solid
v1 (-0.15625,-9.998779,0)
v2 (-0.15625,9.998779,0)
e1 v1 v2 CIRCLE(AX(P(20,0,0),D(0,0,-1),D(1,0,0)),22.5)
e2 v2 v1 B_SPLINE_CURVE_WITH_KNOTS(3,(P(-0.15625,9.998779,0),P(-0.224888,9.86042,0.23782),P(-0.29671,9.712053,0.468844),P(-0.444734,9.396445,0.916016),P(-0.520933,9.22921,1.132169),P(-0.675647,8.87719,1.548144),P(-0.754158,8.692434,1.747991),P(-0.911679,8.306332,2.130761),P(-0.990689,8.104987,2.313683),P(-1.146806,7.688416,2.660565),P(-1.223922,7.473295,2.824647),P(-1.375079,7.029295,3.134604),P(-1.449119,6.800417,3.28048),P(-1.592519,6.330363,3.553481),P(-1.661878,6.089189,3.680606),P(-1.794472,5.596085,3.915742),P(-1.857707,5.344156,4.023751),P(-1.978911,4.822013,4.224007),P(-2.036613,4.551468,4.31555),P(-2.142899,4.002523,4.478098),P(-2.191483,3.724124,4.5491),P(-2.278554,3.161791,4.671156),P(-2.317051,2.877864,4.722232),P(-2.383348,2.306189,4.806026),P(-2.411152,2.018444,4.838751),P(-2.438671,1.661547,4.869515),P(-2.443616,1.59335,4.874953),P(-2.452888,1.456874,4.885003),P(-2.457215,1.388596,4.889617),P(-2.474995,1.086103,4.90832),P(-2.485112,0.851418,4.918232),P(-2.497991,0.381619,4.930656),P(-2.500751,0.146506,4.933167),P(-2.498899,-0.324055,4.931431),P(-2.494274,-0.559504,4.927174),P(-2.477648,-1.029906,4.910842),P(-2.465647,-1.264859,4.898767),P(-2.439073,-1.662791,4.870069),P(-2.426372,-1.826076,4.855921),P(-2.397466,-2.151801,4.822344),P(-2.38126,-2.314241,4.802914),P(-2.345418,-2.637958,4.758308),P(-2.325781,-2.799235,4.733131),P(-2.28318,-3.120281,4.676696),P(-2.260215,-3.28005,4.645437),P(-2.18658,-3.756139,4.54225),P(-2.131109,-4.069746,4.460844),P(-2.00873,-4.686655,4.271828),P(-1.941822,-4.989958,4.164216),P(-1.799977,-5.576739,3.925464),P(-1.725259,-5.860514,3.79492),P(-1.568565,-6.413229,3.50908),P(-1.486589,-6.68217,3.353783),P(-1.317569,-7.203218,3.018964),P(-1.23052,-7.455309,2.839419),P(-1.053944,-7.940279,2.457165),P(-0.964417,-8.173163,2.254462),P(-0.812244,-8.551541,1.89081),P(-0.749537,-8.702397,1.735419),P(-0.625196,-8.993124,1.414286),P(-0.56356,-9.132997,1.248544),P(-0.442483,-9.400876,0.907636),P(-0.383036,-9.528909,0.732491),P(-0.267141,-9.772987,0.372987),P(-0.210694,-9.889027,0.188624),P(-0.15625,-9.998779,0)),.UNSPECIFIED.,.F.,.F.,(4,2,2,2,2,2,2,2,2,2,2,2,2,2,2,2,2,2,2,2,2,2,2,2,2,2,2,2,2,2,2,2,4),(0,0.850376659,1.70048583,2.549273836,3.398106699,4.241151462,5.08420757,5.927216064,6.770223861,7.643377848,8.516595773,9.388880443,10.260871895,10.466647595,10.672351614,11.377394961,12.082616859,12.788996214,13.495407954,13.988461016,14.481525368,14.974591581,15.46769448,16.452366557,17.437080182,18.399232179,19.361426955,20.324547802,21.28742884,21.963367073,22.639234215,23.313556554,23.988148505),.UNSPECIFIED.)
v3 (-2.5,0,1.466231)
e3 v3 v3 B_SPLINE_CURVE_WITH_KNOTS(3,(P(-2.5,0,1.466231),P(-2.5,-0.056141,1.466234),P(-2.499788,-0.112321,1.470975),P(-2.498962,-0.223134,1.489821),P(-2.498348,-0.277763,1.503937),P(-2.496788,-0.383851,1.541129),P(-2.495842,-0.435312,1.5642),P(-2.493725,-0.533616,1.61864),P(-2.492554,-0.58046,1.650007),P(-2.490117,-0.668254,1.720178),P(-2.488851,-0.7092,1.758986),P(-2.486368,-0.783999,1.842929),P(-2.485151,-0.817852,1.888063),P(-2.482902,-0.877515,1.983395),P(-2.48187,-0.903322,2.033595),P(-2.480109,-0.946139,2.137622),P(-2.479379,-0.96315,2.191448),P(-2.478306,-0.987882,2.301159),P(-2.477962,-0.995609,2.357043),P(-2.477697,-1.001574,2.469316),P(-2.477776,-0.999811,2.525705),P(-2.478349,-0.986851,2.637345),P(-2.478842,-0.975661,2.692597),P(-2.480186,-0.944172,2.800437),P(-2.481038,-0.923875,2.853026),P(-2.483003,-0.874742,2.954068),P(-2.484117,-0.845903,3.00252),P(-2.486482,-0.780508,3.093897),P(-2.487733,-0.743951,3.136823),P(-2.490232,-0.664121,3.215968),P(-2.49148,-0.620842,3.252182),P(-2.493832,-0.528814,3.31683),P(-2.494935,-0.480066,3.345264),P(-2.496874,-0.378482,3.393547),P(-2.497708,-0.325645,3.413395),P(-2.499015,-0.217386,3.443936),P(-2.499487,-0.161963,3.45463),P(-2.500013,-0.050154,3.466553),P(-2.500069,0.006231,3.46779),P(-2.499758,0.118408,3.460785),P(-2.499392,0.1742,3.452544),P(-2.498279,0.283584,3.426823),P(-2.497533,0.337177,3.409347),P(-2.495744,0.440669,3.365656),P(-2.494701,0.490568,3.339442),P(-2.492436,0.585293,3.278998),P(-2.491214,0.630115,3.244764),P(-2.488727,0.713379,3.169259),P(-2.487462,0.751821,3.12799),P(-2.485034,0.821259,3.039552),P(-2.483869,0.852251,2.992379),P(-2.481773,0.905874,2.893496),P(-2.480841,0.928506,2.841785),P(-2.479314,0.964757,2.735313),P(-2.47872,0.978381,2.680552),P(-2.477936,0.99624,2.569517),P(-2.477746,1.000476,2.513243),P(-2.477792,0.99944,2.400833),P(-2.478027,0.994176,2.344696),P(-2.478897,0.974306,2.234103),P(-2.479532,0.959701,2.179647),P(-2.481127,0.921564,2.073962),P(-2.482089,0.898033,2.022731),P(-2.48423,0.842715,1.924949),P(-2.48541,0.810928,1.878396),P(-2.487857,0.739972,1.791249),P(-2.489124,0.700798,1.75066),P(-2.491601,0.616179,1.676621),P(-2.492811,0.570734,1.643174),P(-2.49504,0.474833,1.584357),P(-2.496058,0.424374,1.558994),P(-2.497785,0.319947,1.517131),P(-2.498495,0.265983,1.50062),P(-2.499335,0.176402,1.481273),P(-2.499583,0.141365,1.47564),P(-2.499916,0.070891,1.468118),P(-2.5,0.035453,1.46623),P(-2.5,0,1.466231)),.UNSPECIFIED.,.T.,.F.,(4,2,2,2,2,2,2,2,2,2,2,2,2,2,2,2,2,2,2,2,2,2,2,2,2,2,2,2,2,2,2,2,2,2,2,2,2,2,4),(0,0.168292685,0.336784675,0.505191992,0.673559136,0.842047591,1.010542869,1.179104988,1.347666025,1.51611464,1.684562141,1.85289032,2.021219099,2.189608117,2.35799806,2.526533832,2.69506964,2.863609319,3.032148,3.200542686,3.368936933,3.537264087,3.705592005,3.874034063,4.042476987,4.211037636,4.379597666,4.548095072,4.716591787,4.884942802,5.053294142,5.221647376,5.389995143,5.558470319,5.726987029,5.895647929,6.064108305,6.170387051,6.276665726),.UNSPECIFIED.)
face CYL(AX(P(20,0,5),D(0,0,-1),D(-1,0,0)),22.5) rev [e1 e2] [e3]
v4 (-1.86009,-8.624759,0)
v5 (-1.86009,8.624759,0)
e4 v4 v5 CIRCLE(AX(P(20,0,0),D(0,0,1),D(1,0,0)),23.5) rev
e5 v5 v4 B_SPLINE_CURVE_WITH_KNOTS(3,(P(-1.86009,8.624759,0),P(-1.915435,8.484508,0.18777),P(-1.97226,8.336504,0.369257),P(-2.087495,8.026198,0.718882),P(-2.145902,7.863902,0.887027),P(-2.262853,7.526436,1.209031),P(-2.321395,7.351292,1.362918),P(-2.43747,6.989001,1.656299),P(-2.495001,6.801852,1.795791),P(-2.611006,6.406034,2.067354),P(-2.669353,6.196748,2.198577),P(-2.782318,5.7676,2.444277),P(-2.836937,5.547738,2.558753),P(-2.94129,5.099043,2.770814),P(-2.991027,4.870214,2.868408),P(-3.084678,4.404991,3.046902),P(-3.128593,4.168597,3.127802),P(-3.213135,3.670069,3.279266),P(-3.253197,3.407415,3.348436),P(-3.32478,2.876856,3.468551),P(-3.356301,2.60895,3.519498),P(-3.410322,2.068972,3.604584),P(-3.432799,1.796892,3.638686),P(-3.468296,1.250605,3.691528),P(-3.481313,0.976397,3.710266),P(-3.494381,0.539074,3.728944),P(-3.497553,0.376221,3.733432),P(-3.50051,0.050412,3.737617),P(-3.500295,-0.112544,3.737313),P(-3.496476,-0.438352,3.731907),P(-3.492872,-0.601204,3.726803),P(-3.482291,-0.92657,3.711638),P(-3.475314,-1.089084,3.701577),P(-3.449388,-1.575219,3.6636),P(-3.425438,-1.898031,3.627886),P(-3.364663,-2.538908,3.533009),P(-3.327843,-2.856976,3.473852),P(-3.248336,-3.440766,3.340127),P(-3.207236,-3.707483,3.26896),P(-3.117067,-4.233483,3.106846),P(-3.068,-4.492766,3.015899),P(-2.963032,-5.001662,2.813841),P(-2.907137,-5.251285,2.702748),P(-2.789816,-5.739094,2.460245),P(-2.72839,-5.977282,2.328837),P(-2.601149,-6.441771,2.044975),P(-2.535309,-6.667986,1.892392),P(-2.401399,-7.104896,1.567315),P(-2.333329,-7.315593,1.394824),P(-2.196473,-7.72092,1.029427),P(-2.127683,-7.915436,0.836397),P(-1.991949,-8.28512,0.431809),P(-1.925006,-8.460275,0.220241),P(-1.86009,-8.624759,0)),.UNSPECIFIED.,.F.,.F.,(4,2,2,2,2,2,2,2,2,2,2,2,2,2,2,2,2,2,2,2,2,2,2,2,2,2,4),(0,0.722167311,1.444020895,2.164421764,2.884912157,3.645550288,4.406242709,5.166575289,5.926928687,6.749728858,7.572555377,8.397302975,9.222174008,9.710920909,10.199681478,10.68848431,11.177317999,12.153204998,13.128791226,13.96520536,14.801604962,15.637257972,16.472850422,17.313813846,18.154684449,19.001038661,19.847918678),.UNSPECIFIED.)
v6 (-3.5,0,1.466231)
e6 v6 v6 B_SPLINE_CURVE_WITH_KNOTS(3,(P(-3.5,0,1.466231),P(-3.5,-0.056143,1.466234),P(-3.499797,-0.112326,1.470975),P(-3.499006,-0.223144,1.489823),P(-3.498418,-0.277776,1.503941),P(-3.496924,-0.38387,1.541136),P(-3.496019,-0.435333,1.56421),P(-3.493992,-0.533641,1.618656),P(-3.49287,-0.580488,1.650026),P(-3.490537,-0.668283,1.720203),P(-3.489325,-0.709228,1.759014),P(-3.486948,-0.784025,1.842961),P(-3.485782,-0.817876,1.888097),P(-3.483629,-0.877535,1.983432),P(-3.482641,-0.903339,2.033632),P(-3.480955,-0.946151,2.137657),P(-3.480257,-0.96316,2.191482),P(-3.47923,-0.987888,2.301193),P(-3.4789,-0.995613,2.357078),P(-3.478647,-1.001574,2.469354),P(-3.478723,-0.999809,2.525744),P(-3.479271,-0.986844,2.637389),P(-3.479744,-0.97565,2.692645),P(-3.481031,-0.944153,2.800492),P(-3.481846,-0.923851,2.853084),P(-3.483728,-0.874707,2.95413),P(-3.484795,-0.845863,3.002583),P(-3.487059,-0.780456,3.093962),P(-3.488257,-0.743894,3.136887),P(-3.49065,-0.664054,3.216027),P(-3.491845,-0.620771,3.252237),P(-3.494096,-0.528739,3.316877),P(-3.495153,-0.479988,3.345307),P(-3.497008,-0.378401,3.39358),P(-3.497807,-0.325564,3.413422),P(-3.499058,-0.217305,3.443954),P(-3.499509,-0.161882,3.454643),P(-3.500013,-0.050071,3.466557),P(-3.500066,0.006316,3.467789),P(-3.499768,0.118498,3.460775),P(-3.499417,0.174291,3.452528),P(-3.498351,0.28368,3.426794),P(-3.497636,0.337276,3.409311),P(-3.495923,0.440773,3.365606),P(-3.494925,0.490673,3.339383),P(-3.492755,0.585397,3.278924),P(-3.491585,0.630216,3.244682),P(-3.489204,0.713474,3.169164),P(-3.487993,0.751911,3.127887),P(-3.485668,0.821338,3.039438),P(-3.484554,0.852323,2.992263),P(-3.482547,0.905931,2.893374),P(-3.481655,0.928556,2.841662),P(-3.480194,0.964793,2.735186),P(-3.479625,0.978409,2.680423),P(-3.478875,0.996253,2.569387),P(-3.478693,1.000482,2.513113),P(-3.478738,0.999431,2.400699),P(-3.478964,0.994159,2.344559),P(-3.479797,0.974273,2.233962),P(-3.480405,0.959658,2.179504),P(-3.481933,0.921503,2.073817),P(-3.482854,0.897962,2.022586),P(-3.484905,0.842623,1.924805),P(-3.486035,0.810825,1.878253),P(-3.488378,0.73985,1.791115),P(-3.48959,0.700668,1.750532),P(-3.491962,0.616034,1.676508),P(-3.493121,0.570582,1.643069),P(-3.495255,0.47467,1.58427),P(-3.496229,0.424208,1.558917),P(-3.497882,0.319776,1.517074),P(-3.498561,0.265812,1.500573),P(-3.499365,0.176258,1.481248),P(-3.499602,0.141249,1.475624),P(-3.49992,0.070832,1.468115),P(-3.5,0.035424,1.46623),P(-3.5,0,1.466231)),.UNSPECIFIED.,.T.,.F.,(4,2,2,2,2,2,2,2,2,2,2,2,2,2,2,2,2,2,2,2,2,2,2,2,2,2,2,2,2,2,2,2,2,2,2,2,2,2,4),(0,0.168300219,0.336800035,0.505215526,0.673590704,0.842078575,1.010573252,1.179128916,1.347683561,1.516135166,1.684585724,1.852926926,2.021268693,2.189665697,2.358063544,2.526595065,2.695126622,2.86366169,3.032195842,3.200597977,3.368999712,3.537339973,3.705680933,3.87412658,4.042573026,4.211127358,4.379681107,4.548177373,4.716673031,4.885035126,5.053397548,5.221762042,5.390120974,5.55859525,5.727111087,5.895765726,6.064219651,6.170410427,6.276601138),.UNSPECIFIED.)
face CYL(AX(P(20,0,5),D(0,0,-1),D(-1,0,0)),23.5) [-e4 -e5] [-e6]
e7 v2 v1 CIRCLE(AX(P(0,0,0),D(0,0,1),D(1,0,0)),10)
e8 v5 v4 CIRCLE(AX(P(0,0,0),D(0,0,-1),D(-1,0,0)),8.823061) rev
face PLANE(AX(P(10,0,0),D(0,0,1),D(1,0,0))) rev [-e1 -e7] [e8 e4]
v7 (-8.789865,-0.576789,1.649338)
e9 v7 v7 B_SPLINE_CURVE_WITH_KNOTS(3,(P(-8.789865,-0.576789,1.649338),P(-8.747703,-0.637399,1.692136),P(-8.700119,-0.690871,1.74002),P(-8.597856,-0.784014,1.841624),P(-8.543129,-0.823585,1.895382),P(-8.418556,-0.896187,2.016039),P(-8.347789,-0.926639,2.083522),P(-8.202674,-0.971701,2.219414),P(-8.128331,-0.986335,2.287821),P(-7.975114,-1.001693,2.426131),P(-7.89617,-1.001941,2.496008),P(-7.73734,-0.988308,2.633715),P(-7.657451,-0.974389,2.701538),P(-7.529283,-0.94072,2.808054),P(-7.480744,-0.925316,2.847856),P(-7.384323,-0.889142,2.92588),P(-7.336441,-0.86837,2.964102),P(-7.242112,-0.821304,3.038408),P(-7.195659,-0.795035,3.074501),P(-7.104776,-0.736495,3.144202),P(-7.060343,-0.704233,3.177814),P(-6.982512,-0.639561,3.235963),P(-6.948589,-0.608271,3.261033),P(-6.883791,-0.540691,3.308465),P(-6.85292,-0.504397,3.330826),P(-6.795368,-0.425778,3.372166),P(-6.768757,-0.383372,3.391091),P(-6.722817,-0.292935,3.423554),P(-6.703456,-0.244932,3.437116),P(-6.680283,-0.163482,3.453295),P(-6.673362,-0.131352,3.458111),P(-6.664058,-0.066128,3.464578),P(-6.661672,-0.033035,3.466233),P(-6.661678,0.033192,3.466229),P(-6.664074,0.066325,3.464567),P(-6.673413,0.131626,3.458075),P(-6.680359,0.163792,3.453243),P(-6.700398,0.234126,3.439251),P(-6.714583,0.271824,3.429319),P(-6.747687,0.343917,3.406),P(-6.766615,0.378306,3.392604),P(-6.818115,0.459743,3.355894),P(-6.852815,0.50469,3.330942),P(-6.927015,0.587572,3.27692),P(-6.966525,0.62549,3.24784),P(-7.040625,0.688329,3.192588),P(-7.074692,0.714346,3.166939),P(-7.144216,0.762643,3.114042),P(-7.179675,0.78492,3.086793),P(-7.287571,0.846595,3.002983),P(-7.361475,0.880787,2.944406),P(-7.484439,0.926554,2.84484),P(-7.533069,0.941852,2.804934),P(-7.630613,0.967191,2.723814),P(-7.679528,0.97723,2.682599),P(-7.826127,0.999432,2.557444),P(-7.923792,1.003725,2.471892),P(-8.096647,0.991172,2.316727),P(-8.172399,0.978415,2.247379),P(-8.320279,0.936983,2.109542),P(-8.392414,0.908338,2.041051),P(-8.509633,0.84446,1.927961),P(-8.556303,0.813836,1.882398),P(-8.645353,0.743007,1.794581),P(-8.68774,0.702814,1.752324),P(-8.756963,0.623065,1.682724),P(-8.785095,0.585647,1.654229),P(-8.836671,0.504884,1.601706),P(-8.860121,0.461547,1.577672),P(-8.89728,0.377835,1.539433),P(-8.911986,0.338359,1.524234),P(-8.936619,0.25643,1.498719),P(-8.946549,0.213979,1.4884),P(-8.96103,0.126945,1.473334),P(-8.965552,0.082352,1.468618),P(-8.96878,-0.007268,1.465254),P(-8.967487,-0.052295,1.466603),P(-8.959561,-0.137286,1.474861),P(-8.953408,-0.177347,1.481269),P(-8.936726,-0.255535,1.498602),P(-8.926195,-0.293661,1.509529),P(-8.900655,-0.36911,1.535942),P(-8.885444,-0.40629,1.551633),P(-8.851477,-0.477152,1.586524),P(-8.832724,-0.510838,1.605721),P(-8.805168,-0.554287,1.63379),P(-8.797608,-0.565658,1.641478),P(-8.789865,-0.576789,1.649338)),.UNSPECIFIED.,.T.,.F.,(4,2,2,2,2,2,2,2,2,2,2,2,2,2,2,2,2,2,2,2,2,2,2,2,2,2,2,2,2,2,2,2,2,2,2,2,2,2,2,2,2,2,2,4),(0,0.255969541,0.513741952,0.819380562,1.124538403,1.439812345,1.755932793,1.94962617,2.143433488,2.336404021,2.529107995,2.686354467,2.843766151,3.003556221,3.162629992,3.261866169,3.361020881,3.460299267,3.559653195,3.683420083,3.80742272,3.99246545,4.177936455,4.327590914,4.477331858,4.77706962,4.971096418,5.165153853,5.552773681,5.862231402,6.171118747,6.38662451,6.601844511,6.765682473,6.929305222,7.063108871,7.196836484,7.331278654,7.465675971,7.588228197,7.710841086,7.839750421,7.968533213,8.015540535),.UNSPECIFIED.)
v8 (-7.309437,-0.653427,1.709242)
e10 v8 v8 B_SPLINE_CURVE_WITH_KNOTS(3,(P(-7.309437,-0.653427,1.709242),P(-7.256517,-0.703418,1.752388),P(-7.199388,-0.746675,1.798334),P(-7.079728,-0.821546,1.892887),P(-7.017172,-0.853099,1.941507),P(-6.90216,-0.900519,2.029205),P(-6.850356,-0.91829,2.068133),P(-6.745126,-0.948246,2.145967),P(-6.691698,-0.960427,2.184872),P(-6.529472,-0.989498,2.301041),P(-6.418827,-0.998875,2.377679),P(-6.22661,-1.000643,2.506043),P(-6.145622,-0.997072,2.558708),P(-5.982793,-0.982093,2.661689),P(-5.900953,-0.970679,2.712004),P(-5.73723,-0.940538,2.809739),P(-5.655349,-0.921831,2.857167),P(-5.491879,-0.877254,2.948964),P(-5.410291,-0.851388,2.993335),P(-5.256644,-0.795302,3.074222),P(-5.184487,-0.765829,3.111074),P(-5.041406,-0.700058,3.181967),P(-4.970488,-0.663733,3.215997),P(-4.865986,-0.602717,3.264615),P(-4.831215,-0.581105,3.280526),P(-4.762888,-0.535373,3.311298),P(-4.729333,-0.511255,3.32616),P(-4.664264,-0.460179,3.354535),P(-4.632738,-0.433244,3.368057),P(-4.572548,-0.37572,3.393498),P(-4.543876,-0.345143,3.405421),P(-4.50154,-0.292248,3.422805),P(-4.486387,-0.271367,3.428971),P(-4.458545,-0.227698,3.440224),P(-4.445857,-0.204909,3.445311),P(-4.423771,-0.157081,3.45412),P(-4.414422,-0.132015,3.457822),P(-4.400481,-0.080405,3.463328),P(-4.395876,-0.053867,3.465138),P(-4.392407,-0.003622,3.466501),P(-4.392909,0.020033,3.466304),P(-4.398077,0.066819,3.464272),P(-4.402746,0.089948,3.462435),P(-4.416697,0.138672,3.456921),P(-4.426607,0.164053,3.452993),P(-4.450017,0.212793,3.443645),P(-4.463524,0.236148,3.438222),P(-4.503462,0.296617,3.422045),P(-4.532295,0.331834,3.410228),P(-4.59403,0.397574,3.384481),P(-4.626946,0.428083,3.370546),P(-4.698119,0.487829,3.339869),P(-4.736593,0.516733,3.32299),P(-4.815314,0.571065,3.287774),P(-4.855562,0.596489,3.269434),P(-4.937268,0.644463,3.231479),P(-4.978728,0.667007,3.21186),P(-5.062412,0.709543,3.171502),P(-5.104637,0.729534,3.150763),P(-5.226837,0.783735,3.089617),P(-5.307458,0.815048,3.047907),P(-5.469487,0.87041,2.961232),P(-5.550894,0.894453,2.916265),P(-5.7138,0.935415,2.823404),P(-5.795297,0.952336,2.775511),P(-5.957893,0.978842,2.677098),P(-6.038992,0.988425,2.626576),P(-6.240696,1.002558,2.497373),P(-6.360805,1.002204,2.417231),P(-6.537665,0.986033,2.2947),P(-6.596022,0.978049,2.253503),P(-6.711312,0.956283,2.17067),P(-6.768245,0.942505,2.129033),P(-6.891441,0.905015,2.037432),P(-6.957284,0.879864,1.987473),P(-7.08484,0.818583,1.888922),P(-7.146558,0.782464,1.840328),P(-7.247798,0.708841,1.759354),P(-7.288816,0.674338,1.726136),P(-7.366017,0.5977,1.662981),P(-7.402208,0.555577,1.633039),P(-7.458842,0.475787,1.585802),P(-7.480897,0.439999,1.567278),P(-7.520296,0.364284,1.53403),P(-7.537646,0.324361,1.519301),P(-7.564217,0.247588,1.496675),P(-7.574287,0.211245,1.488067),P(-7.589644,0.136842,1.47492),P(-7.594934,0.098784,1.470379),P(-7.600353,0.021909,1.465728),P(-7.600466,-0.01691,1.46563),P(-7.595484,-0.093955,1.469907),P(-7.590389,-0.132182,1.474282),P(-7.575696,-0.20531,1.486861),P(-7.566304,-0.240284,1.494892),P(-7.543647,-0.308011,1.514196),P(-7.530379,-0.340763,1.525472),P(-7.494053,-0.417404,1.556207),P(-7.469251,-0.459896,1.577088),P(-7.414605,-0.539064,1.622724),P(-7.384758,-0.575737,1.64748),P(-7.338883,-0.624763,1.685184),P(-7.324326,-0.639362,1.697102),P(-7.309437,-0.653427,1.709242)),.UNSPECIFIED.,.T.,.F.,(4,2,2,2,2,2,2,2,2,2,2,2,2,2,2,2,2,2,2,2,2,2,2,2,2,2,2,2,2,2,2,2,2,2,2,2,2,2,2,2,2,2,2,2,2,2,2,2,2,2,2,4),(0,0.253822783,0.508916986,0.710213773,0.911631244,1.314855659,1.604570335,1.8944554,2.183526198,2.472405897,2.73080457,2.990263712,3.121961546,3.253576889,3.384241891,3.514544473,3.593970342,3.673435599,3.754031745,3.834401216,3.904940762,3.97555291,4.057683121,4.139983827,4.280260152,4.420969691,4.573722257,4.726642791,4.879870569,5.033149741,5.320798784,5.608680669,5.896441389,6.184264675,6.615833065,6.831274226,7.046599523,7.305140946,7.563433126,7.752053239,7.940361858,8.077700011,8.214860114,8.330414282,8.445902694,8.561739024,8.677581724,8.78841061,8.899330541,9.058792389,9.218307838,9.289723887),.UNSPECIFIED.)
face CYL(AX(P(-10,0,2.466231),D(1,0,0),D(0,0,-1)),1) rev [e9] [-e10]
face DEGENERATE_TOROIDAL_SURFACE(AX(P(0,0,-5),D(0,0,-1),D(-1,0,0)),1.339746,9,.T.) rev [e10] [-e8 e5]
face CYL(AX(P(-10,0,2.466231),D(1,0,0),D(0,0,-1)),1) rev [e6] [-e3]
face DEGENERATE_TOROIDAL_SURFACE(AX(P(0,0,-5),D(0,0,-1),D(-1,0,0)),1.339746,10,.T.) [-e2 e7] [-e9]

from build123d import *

# Parameters (mm, degrees)
BOSS_EXTRUDE1_DEPTH = 5
FILLET1_R           = 10
SHELL1_T            = -1
SKETCH4_R           = 1
CUT_EXTRUDE1_DEPTH  = 15.976807967


with BuildPart() as part:
    # Sketch1 → Boss-Extrude1 (new body)
    with BuildSketch(Plane.XY):
        with BuildLine():
            ThreePointArc((-0.15625, 9.998779222), (-10, 0), (-0.15625, -9.998779222))
            ThreePointArc((-0.15625, -9.998779222), (-2.5, 0), (-0.15625, 9.998779222))
        make_face()
    extrude(amount=BOSS_EXTRUDE1_DEPTH)

    # Fillet1
    # the kernel refuses this fillet: 10 mm, written as the material it takes off along each edge
    with BuildSketch(Plane(origin=(0, 0, 5), x_dir=(0.9999950652018581, 0.003141587485880102, 0), z_dir=(0.003141587485880102, -0.9999950652018581, 0))) as fillet1_piece_1:
        with BuildLine():
            CenterArc((1.339745962, -10), FILLET1_R, 30, 60)
            Line((1.339745962, 0), (1.339745962, 0.2))
            Line((1.339745962, 0.2), (10, 0.2))
            Line((10, 0.2), (10.2, 0))
            ThreePointArc((10.2, 0), (10.2, -2.5), (10.173205081, -4.9))
            Line((10.173205081, -4.9), (10, -5))
        make_face()
    revolve(axis=Axis((0, 0, 5), (0, 0, 1)), revolution_arc=359.64, mode=Mode.SUBTRACT)

    # Shell1
    shell1_openings = [part.faces().sort_by_distance(p)[0] for p in [
        (-5.162614347, 0, 0),
    ]]
    offset(amount=SHELL1_T, openings=shell1_openings, kind=Kind.INTERSECTION)

    # Sketch4 → Cut-Extrude1 (cut, through all)
    with BuildSketch(Plane(origin=(0, 0, 0), x_dir=(0, 0, -1), z_dir=(1, 0, 0))):
        with Locations(Location((-2.466231233, 0, 0), (0, 0, 324.775001353))):
            Circle(SKETCH4_R)
    extrude(amount=-CUT_EXTRUDE1_DEPTH, mode=Mode.SUBTRACT)


solid = part.part
